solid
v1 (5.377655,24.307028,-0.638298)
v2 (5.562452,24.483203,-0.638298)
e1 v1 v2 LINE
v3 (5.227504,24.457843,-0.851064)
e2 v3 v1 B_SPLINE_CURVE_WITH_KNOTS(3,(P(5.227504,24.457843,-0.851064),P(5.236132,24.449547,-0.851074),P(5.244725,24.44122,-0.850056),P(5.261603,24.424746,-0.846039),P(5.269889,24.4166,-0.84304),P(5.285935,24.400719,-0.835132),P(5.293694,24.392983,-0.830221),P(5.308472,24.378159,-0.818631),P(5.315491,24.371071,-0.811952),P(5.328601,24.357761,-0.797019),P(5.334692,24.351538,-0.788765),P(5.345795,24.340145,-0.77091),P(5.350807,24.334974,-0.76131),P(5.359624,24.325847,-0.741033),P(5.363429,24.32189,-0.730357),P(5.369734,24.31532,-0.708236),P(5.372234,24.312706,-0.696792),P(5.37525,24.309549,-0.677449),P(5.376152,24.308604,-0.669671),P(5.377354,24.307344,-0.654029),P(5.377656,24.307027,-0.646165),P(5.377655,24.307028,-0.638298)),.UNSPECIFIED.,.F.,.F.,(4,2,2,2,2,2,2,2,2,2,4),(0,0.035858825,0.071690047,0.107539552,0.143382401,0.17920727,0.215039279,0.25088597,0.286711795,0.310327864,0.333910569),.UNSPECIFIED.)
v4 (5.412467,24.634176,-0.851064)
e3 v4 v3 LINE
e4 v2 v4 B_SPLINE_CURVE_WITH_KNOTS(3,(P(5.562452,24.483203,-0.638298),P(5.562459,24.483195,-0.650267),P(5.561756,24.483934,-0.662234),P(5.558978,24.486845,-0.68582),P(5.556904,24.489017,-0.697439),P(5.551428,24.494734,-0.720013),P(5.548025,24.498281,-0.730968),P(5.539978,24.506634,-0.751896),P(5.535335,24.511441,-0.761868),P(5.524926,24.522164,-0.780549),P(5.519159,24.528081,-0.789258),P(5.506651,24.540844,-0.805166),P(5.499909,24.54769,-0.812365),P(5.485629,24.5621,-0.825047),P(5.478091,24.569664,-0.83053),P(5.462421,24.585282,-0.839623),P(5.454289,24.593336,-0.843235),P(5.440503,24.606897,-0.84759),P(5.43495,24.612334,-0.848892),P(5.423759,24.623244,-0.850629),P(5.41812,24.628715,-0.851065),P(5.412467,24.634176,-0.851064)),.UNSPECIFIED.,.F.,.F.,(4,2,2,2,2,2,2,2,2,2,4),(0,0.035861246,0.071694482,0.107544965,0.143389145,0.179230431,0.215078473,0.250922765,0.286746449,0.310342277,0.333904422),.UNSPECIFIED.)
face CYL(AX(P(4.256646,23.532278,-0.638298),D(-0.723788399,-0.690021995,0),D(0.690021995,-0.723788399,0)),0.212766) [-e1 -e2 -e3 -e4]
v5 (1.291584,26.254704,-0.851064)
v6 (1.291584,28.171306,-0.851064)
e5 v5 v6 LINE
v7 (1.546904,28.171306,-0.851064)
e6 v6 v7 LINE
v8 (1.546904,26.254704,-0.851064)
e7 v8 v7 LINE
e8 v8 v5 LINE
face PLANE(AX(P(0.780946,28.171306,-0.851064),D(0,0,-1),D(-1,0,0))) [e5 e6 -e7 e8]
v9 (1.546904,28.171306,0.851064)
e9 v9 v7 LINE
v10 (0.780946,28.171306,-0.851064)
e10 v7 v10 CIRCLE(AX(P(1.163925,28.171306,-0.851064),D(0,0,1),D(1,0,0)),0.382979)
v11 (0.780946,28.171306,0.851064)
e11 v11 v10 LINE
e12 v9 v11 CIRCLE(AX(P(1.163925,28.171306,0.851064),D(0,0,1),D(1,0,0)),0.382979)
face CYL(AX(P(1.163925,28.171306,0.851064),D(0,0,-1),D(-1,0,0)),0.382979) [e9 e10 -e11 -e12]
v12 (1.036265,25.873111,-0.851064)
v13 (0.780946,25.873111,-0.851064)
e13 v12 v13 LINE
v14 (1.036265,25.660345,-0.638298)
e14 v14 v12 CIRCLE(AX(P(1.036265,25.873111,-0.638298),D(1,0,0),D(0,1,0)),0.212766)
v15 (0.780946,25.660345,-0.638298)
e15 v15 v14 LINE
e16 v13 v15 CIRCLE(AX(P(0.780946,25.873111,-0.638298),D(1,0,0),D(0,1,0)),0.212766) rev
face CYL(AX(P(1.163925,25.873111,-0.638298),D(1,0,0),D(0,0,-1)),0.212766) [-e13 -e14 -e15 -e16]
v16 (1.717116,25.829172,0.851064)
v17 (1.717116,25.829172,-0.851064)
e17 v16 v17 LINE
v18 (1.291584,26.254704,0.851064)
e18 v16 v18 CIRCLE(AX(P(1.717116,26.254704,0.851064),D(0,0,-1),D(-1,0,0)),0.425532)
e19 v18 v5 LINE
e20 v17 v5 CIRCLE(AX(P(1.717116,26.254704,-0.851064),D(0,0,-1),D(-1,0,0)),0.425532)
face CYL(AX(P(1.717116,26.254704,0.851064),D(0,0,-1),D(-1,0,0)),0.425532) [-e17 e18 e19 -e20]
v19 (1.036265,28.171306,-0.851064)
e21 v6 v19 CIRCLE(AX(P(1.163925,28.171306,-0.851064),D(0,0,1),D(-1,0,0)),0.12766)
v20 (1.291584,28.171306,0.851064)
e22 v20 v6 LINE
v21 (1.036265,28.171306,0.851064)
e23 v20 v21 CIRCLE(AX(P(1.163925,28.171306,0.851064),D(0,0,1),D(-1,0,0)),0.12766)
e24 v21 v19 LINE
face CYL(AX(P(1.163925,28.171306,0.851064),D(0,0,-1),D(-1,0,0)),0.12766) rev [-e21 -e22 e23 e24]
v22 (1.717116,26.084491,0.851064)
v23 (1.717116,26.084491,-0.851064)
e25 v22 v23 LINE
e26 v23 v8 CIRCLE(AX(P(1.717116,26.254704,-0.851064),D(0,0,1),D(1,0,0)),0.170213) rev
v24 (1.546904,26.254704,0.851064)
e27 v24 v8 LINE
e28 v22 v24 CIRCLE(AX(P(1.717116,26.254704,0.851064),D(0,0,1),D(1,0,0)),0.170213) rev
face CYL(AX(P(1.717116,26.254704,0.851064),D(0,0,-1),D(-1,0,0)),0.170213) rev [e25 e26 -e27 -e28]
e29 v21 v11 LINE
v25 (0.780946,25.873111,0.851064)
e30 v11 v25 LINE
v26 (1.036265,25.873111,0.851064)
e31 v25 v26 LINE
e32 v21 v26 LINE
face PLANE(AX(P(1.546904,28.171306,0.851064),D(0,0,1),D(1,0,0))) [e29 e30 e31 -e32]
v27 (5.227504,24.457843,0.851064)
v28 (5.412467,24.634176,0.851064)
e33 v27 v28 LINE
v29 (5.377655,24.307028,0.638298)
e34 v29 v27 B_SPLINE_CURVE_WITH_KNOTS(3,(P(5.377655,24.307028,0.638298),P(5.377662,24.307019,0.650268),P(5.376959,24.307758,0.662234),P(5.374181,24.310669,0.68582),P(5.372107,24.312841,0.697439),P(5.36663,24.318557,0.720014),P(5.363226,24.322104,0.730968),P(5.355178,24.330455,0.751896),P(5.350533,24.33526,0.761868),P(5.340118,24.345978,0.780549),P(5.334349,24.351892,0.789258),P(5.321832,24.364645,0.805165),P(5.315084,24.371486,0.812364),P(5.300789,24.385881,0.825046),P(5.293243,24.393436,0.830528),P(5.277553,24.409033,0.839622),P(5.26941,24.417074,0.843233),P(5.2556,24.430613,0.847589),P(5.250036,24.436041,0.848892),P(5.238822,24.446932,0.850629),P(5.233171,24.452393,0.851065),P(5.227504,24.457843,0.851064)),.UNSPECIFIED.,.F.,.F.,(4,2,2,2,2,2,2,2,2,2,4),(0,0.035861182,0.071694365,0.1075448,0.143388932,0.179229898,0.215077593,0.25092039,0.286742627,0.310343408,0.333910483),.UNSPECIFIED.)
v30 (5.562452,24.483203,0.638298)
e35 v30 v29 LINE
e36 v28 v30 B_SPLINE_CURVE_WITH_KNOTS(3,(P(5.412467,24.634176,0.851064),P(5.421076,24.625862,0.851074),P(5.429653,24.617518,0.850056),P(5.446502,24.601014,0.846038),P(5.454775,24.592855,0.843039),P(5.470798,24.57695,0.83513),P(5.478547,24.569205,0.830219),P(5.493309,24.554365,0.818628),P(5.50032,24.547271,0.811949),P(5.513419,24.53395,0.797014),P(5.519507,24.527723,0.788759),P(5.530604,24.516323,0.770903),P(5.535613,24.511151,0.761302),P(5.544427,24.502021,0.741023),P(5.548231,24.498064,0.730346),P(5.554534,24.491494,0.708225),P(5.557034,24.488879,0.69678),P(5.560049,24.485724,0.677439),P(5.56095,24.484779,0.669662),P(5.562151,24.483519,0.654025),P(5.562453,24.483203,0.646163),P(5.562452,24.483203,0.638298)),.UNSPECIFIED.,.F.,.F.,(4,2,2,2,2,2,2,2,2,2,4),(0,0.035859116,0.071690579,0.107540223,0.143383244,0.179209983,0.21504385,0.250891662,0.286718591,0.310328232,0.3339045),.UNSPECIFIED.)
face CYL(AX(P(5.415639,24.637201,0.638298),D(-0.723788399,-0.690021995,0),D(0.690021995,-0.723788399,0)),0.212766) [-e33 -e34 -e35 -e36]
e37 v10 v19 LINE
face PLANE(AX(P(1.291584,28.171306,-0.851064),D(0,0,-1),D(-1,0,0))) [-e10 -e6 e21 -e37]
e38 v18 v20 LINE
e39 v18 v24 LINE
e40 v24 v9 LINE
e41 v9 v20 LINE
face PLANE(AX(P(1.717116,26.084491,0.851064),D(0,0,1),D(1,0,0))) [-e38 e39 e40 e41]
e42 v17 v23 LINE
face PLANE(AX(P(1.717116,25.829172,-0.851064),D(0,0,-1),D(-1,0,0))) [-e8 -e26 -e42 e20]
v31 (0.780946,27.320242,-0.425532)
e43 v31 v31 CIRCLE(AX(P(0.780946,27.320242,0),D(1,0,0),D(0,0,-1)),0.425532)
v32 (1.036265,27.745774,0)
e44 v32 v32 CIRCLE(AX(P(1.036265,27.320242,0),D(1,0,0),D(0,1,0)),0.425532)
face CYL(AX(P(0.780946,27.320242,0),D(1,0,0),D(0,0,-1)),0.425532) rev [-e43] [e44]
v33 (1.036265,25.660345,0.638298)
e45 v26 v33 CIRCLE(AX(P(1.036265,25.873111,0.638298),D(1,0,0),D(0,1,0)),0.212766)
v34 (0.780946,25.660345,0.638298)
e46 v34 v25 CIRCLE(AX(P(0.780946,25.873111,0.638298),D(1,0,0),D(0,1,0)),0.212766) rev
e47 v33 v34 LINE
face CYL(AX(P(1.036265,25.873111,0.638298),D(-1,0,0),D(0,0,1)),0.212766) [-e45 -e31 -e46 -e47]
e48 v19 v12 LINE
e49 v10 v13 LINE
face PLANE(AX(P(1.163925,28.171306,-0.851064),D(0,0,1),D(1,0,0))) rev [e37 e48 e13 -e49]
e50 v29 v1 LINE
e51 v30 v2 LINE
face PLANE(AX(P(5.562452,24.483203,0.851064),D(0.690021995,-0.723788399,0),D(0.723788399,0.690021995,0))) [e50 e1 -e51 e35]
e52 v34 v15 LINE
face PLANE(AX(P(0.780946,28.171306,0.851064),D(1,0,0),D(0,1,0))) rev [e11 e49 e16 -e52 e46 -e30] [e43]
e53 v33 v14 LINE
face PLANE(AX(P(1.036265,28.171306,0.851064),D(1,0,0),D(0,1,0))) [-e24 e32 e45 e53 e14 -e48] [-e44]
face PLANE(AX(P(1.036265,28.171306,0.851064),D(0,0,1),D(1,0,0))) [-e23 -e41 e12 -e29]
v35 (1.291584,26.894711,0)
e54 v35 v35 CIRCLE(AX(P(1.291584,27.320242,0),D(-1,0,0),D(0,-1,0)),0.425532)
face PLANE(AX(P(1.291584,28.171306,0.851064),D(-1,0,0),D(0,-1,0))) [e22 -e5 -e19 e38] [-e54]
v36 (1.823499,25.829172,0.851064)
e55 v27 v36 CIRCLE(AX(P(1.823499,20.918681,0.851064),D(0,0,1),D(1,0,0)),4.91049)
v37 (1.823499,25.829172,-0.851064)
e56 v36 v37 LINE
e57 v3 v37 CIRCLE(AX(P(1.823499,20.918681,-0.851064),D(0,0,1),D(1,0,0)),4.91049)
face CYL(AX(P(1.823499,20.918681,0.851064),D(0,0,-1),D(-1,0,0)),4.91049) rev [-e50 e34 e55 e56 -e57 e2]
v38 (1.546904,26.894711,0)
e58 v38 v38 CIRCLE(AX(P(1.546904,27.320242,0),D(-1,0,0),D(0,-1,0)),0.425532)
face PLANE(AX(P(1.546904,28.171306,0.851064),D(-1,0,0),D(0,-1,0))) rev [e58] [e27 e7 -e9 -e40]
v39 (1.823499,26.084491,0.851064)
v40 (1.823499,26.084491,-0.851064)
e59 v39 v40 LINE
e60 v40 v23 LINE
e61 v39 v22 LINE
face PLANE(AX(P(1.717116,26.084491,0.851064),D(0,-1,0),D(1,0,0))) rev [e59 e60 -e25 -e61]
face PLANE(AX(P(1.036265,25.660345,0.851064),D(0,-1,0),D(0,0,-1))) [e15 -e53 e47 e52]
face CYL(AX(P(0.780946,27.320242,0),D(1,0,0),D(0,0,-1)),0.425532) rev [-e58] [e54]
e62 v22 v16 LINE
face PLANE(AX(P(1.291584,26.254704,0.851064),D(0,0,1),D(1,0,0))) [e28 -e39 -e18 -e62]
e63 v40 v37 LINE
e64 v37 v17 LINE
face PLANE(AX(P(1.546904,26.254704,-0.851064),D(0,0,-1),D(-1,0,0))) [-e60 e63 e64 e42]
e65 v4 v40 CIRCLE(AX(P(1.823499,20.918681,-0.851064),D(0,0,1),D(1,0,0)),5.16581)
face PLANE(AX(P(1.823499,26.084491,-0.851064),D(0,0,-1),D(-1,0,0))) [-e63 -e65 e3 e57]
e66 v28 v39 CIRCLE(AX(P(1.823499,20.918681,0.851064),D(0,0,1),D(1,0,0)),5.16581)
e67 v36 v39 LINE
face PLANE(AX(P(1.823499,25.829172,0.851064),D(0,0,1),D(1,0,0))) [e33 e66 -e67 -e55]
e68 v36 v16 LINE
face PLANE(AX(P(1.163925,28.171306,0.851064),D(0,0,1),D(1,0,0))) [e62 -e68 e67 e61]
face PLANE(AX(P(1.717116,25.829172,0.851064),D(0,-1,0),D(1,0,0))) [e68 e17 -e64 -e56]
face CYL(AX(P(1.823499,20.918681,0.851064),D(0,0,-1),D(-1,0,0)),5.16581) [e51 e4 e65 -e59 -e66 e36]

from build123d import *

# Parameters (mm, degrees)
BASE_FLANGE3_DEPTH      = 4
FILLET3_R               = 1
CUT_EXTRUDE2_DEPTH      = 41.856527321
CUT_EXTRUDE2_DEPTH_BACK = 41.856527321
SKETCH9_R               = 2
ECHELLE2_SCALE          = 0.212765957


# Sheet-metal steps are written as plain solids
with BuildPart() as part:
    # Sketch7 → Base-Flange3 (new, symmetric)
    with BuildSketch(Plane.XY):
        with BuildLine():
            Line((-3.7, 23.065125189), (-3.7, 34.866642891))
            ThreePointArc((-3.7, 34.866642891), (-3.1, 35.466642891), (-2.5, 34.866642891))
            Line((-2.5, 34.866642891), (-2.5, 25.858610285))
            ThreePointArc((-2.5, 25.858610285), (-1.914213562, 24.444396722), (-0.5, 23.858610285))
            Line((-0.5, 23.858610285), (0, 23.858610285))
            ThreePointArc((0, 23.858610285), (9.086009171, 21.994836321), (16.704533318, 16.704533318))
            Line((16.704533318, 16.704533318), (17.573079397, 17.532559712))
            ThreePointArc((17.573079397, 17.532559712), (9.558432883, 23.097930078), (0, 25.058610285))
            Line((0, 25.058610285), (-0.5, 25.058610285))
            ThreePointArc((-0.5, 25.058610285), (-1.065685425, 25.29292486), (-1.3, 25.858610285))
            Line((-1.3, 25.858610285), (-1.3, 34.866642891))
            ThreePointArc((-1.3, 34.866642891), (-3.1, 36.666642891), (-4.9, 34.866642891))
            Line((-4.9, 34.866642891), (-4.9, 23.065125189))
            Line((-4.9, 23.065125189), (-3.7, 23.065125189))
        make_face()
    extrude(amount=BASE_FLANGE3_DEPTH, both=True)

    # Fillet3
    fillet3_edges = [part.edges().sort_by_distance(p)[0] for p in [
        (17.138806358, 17.118546515, -4),
        (-4.3, 23.065125189, -4),
        (17.138806358, 17.118546515, 4),
        (-4.3, 23.065125189, 4),
    ]]
    fillet(fillet3_edges, radius=FILLET3_R)

    # Sketch9 → Cut-Extrude2 (cut, two sides: drawn at the far end of the back side and taken through both)
    with BuildSketch(Plane(origin=(0, 0, 0), x_dir=(0, 0, -1), z_dir=(1, 0, 0)).offset(-CUT_EXTRUDE2_DEPTH_BACK)):
        with Locations(Location((0, 30.866642891, 0), (0, 0, 270))):
            Circle(SKETCH9_R)
    extrude(amount=CUT_EXTRUDE2_DEPTH + CUT_EXTRUDE2_DEPTH_BACK, mode=Mode.SUBTRACT)


with BuildPart() as part_1:
    # Echelle2: scaled about (2.31636153, 26.36174226, 0)
    add(part.part.scale(ECHELLE2_SCALE).moved(Location((1.823518651, 20.752860928, 0))))


solid = part_1.part
